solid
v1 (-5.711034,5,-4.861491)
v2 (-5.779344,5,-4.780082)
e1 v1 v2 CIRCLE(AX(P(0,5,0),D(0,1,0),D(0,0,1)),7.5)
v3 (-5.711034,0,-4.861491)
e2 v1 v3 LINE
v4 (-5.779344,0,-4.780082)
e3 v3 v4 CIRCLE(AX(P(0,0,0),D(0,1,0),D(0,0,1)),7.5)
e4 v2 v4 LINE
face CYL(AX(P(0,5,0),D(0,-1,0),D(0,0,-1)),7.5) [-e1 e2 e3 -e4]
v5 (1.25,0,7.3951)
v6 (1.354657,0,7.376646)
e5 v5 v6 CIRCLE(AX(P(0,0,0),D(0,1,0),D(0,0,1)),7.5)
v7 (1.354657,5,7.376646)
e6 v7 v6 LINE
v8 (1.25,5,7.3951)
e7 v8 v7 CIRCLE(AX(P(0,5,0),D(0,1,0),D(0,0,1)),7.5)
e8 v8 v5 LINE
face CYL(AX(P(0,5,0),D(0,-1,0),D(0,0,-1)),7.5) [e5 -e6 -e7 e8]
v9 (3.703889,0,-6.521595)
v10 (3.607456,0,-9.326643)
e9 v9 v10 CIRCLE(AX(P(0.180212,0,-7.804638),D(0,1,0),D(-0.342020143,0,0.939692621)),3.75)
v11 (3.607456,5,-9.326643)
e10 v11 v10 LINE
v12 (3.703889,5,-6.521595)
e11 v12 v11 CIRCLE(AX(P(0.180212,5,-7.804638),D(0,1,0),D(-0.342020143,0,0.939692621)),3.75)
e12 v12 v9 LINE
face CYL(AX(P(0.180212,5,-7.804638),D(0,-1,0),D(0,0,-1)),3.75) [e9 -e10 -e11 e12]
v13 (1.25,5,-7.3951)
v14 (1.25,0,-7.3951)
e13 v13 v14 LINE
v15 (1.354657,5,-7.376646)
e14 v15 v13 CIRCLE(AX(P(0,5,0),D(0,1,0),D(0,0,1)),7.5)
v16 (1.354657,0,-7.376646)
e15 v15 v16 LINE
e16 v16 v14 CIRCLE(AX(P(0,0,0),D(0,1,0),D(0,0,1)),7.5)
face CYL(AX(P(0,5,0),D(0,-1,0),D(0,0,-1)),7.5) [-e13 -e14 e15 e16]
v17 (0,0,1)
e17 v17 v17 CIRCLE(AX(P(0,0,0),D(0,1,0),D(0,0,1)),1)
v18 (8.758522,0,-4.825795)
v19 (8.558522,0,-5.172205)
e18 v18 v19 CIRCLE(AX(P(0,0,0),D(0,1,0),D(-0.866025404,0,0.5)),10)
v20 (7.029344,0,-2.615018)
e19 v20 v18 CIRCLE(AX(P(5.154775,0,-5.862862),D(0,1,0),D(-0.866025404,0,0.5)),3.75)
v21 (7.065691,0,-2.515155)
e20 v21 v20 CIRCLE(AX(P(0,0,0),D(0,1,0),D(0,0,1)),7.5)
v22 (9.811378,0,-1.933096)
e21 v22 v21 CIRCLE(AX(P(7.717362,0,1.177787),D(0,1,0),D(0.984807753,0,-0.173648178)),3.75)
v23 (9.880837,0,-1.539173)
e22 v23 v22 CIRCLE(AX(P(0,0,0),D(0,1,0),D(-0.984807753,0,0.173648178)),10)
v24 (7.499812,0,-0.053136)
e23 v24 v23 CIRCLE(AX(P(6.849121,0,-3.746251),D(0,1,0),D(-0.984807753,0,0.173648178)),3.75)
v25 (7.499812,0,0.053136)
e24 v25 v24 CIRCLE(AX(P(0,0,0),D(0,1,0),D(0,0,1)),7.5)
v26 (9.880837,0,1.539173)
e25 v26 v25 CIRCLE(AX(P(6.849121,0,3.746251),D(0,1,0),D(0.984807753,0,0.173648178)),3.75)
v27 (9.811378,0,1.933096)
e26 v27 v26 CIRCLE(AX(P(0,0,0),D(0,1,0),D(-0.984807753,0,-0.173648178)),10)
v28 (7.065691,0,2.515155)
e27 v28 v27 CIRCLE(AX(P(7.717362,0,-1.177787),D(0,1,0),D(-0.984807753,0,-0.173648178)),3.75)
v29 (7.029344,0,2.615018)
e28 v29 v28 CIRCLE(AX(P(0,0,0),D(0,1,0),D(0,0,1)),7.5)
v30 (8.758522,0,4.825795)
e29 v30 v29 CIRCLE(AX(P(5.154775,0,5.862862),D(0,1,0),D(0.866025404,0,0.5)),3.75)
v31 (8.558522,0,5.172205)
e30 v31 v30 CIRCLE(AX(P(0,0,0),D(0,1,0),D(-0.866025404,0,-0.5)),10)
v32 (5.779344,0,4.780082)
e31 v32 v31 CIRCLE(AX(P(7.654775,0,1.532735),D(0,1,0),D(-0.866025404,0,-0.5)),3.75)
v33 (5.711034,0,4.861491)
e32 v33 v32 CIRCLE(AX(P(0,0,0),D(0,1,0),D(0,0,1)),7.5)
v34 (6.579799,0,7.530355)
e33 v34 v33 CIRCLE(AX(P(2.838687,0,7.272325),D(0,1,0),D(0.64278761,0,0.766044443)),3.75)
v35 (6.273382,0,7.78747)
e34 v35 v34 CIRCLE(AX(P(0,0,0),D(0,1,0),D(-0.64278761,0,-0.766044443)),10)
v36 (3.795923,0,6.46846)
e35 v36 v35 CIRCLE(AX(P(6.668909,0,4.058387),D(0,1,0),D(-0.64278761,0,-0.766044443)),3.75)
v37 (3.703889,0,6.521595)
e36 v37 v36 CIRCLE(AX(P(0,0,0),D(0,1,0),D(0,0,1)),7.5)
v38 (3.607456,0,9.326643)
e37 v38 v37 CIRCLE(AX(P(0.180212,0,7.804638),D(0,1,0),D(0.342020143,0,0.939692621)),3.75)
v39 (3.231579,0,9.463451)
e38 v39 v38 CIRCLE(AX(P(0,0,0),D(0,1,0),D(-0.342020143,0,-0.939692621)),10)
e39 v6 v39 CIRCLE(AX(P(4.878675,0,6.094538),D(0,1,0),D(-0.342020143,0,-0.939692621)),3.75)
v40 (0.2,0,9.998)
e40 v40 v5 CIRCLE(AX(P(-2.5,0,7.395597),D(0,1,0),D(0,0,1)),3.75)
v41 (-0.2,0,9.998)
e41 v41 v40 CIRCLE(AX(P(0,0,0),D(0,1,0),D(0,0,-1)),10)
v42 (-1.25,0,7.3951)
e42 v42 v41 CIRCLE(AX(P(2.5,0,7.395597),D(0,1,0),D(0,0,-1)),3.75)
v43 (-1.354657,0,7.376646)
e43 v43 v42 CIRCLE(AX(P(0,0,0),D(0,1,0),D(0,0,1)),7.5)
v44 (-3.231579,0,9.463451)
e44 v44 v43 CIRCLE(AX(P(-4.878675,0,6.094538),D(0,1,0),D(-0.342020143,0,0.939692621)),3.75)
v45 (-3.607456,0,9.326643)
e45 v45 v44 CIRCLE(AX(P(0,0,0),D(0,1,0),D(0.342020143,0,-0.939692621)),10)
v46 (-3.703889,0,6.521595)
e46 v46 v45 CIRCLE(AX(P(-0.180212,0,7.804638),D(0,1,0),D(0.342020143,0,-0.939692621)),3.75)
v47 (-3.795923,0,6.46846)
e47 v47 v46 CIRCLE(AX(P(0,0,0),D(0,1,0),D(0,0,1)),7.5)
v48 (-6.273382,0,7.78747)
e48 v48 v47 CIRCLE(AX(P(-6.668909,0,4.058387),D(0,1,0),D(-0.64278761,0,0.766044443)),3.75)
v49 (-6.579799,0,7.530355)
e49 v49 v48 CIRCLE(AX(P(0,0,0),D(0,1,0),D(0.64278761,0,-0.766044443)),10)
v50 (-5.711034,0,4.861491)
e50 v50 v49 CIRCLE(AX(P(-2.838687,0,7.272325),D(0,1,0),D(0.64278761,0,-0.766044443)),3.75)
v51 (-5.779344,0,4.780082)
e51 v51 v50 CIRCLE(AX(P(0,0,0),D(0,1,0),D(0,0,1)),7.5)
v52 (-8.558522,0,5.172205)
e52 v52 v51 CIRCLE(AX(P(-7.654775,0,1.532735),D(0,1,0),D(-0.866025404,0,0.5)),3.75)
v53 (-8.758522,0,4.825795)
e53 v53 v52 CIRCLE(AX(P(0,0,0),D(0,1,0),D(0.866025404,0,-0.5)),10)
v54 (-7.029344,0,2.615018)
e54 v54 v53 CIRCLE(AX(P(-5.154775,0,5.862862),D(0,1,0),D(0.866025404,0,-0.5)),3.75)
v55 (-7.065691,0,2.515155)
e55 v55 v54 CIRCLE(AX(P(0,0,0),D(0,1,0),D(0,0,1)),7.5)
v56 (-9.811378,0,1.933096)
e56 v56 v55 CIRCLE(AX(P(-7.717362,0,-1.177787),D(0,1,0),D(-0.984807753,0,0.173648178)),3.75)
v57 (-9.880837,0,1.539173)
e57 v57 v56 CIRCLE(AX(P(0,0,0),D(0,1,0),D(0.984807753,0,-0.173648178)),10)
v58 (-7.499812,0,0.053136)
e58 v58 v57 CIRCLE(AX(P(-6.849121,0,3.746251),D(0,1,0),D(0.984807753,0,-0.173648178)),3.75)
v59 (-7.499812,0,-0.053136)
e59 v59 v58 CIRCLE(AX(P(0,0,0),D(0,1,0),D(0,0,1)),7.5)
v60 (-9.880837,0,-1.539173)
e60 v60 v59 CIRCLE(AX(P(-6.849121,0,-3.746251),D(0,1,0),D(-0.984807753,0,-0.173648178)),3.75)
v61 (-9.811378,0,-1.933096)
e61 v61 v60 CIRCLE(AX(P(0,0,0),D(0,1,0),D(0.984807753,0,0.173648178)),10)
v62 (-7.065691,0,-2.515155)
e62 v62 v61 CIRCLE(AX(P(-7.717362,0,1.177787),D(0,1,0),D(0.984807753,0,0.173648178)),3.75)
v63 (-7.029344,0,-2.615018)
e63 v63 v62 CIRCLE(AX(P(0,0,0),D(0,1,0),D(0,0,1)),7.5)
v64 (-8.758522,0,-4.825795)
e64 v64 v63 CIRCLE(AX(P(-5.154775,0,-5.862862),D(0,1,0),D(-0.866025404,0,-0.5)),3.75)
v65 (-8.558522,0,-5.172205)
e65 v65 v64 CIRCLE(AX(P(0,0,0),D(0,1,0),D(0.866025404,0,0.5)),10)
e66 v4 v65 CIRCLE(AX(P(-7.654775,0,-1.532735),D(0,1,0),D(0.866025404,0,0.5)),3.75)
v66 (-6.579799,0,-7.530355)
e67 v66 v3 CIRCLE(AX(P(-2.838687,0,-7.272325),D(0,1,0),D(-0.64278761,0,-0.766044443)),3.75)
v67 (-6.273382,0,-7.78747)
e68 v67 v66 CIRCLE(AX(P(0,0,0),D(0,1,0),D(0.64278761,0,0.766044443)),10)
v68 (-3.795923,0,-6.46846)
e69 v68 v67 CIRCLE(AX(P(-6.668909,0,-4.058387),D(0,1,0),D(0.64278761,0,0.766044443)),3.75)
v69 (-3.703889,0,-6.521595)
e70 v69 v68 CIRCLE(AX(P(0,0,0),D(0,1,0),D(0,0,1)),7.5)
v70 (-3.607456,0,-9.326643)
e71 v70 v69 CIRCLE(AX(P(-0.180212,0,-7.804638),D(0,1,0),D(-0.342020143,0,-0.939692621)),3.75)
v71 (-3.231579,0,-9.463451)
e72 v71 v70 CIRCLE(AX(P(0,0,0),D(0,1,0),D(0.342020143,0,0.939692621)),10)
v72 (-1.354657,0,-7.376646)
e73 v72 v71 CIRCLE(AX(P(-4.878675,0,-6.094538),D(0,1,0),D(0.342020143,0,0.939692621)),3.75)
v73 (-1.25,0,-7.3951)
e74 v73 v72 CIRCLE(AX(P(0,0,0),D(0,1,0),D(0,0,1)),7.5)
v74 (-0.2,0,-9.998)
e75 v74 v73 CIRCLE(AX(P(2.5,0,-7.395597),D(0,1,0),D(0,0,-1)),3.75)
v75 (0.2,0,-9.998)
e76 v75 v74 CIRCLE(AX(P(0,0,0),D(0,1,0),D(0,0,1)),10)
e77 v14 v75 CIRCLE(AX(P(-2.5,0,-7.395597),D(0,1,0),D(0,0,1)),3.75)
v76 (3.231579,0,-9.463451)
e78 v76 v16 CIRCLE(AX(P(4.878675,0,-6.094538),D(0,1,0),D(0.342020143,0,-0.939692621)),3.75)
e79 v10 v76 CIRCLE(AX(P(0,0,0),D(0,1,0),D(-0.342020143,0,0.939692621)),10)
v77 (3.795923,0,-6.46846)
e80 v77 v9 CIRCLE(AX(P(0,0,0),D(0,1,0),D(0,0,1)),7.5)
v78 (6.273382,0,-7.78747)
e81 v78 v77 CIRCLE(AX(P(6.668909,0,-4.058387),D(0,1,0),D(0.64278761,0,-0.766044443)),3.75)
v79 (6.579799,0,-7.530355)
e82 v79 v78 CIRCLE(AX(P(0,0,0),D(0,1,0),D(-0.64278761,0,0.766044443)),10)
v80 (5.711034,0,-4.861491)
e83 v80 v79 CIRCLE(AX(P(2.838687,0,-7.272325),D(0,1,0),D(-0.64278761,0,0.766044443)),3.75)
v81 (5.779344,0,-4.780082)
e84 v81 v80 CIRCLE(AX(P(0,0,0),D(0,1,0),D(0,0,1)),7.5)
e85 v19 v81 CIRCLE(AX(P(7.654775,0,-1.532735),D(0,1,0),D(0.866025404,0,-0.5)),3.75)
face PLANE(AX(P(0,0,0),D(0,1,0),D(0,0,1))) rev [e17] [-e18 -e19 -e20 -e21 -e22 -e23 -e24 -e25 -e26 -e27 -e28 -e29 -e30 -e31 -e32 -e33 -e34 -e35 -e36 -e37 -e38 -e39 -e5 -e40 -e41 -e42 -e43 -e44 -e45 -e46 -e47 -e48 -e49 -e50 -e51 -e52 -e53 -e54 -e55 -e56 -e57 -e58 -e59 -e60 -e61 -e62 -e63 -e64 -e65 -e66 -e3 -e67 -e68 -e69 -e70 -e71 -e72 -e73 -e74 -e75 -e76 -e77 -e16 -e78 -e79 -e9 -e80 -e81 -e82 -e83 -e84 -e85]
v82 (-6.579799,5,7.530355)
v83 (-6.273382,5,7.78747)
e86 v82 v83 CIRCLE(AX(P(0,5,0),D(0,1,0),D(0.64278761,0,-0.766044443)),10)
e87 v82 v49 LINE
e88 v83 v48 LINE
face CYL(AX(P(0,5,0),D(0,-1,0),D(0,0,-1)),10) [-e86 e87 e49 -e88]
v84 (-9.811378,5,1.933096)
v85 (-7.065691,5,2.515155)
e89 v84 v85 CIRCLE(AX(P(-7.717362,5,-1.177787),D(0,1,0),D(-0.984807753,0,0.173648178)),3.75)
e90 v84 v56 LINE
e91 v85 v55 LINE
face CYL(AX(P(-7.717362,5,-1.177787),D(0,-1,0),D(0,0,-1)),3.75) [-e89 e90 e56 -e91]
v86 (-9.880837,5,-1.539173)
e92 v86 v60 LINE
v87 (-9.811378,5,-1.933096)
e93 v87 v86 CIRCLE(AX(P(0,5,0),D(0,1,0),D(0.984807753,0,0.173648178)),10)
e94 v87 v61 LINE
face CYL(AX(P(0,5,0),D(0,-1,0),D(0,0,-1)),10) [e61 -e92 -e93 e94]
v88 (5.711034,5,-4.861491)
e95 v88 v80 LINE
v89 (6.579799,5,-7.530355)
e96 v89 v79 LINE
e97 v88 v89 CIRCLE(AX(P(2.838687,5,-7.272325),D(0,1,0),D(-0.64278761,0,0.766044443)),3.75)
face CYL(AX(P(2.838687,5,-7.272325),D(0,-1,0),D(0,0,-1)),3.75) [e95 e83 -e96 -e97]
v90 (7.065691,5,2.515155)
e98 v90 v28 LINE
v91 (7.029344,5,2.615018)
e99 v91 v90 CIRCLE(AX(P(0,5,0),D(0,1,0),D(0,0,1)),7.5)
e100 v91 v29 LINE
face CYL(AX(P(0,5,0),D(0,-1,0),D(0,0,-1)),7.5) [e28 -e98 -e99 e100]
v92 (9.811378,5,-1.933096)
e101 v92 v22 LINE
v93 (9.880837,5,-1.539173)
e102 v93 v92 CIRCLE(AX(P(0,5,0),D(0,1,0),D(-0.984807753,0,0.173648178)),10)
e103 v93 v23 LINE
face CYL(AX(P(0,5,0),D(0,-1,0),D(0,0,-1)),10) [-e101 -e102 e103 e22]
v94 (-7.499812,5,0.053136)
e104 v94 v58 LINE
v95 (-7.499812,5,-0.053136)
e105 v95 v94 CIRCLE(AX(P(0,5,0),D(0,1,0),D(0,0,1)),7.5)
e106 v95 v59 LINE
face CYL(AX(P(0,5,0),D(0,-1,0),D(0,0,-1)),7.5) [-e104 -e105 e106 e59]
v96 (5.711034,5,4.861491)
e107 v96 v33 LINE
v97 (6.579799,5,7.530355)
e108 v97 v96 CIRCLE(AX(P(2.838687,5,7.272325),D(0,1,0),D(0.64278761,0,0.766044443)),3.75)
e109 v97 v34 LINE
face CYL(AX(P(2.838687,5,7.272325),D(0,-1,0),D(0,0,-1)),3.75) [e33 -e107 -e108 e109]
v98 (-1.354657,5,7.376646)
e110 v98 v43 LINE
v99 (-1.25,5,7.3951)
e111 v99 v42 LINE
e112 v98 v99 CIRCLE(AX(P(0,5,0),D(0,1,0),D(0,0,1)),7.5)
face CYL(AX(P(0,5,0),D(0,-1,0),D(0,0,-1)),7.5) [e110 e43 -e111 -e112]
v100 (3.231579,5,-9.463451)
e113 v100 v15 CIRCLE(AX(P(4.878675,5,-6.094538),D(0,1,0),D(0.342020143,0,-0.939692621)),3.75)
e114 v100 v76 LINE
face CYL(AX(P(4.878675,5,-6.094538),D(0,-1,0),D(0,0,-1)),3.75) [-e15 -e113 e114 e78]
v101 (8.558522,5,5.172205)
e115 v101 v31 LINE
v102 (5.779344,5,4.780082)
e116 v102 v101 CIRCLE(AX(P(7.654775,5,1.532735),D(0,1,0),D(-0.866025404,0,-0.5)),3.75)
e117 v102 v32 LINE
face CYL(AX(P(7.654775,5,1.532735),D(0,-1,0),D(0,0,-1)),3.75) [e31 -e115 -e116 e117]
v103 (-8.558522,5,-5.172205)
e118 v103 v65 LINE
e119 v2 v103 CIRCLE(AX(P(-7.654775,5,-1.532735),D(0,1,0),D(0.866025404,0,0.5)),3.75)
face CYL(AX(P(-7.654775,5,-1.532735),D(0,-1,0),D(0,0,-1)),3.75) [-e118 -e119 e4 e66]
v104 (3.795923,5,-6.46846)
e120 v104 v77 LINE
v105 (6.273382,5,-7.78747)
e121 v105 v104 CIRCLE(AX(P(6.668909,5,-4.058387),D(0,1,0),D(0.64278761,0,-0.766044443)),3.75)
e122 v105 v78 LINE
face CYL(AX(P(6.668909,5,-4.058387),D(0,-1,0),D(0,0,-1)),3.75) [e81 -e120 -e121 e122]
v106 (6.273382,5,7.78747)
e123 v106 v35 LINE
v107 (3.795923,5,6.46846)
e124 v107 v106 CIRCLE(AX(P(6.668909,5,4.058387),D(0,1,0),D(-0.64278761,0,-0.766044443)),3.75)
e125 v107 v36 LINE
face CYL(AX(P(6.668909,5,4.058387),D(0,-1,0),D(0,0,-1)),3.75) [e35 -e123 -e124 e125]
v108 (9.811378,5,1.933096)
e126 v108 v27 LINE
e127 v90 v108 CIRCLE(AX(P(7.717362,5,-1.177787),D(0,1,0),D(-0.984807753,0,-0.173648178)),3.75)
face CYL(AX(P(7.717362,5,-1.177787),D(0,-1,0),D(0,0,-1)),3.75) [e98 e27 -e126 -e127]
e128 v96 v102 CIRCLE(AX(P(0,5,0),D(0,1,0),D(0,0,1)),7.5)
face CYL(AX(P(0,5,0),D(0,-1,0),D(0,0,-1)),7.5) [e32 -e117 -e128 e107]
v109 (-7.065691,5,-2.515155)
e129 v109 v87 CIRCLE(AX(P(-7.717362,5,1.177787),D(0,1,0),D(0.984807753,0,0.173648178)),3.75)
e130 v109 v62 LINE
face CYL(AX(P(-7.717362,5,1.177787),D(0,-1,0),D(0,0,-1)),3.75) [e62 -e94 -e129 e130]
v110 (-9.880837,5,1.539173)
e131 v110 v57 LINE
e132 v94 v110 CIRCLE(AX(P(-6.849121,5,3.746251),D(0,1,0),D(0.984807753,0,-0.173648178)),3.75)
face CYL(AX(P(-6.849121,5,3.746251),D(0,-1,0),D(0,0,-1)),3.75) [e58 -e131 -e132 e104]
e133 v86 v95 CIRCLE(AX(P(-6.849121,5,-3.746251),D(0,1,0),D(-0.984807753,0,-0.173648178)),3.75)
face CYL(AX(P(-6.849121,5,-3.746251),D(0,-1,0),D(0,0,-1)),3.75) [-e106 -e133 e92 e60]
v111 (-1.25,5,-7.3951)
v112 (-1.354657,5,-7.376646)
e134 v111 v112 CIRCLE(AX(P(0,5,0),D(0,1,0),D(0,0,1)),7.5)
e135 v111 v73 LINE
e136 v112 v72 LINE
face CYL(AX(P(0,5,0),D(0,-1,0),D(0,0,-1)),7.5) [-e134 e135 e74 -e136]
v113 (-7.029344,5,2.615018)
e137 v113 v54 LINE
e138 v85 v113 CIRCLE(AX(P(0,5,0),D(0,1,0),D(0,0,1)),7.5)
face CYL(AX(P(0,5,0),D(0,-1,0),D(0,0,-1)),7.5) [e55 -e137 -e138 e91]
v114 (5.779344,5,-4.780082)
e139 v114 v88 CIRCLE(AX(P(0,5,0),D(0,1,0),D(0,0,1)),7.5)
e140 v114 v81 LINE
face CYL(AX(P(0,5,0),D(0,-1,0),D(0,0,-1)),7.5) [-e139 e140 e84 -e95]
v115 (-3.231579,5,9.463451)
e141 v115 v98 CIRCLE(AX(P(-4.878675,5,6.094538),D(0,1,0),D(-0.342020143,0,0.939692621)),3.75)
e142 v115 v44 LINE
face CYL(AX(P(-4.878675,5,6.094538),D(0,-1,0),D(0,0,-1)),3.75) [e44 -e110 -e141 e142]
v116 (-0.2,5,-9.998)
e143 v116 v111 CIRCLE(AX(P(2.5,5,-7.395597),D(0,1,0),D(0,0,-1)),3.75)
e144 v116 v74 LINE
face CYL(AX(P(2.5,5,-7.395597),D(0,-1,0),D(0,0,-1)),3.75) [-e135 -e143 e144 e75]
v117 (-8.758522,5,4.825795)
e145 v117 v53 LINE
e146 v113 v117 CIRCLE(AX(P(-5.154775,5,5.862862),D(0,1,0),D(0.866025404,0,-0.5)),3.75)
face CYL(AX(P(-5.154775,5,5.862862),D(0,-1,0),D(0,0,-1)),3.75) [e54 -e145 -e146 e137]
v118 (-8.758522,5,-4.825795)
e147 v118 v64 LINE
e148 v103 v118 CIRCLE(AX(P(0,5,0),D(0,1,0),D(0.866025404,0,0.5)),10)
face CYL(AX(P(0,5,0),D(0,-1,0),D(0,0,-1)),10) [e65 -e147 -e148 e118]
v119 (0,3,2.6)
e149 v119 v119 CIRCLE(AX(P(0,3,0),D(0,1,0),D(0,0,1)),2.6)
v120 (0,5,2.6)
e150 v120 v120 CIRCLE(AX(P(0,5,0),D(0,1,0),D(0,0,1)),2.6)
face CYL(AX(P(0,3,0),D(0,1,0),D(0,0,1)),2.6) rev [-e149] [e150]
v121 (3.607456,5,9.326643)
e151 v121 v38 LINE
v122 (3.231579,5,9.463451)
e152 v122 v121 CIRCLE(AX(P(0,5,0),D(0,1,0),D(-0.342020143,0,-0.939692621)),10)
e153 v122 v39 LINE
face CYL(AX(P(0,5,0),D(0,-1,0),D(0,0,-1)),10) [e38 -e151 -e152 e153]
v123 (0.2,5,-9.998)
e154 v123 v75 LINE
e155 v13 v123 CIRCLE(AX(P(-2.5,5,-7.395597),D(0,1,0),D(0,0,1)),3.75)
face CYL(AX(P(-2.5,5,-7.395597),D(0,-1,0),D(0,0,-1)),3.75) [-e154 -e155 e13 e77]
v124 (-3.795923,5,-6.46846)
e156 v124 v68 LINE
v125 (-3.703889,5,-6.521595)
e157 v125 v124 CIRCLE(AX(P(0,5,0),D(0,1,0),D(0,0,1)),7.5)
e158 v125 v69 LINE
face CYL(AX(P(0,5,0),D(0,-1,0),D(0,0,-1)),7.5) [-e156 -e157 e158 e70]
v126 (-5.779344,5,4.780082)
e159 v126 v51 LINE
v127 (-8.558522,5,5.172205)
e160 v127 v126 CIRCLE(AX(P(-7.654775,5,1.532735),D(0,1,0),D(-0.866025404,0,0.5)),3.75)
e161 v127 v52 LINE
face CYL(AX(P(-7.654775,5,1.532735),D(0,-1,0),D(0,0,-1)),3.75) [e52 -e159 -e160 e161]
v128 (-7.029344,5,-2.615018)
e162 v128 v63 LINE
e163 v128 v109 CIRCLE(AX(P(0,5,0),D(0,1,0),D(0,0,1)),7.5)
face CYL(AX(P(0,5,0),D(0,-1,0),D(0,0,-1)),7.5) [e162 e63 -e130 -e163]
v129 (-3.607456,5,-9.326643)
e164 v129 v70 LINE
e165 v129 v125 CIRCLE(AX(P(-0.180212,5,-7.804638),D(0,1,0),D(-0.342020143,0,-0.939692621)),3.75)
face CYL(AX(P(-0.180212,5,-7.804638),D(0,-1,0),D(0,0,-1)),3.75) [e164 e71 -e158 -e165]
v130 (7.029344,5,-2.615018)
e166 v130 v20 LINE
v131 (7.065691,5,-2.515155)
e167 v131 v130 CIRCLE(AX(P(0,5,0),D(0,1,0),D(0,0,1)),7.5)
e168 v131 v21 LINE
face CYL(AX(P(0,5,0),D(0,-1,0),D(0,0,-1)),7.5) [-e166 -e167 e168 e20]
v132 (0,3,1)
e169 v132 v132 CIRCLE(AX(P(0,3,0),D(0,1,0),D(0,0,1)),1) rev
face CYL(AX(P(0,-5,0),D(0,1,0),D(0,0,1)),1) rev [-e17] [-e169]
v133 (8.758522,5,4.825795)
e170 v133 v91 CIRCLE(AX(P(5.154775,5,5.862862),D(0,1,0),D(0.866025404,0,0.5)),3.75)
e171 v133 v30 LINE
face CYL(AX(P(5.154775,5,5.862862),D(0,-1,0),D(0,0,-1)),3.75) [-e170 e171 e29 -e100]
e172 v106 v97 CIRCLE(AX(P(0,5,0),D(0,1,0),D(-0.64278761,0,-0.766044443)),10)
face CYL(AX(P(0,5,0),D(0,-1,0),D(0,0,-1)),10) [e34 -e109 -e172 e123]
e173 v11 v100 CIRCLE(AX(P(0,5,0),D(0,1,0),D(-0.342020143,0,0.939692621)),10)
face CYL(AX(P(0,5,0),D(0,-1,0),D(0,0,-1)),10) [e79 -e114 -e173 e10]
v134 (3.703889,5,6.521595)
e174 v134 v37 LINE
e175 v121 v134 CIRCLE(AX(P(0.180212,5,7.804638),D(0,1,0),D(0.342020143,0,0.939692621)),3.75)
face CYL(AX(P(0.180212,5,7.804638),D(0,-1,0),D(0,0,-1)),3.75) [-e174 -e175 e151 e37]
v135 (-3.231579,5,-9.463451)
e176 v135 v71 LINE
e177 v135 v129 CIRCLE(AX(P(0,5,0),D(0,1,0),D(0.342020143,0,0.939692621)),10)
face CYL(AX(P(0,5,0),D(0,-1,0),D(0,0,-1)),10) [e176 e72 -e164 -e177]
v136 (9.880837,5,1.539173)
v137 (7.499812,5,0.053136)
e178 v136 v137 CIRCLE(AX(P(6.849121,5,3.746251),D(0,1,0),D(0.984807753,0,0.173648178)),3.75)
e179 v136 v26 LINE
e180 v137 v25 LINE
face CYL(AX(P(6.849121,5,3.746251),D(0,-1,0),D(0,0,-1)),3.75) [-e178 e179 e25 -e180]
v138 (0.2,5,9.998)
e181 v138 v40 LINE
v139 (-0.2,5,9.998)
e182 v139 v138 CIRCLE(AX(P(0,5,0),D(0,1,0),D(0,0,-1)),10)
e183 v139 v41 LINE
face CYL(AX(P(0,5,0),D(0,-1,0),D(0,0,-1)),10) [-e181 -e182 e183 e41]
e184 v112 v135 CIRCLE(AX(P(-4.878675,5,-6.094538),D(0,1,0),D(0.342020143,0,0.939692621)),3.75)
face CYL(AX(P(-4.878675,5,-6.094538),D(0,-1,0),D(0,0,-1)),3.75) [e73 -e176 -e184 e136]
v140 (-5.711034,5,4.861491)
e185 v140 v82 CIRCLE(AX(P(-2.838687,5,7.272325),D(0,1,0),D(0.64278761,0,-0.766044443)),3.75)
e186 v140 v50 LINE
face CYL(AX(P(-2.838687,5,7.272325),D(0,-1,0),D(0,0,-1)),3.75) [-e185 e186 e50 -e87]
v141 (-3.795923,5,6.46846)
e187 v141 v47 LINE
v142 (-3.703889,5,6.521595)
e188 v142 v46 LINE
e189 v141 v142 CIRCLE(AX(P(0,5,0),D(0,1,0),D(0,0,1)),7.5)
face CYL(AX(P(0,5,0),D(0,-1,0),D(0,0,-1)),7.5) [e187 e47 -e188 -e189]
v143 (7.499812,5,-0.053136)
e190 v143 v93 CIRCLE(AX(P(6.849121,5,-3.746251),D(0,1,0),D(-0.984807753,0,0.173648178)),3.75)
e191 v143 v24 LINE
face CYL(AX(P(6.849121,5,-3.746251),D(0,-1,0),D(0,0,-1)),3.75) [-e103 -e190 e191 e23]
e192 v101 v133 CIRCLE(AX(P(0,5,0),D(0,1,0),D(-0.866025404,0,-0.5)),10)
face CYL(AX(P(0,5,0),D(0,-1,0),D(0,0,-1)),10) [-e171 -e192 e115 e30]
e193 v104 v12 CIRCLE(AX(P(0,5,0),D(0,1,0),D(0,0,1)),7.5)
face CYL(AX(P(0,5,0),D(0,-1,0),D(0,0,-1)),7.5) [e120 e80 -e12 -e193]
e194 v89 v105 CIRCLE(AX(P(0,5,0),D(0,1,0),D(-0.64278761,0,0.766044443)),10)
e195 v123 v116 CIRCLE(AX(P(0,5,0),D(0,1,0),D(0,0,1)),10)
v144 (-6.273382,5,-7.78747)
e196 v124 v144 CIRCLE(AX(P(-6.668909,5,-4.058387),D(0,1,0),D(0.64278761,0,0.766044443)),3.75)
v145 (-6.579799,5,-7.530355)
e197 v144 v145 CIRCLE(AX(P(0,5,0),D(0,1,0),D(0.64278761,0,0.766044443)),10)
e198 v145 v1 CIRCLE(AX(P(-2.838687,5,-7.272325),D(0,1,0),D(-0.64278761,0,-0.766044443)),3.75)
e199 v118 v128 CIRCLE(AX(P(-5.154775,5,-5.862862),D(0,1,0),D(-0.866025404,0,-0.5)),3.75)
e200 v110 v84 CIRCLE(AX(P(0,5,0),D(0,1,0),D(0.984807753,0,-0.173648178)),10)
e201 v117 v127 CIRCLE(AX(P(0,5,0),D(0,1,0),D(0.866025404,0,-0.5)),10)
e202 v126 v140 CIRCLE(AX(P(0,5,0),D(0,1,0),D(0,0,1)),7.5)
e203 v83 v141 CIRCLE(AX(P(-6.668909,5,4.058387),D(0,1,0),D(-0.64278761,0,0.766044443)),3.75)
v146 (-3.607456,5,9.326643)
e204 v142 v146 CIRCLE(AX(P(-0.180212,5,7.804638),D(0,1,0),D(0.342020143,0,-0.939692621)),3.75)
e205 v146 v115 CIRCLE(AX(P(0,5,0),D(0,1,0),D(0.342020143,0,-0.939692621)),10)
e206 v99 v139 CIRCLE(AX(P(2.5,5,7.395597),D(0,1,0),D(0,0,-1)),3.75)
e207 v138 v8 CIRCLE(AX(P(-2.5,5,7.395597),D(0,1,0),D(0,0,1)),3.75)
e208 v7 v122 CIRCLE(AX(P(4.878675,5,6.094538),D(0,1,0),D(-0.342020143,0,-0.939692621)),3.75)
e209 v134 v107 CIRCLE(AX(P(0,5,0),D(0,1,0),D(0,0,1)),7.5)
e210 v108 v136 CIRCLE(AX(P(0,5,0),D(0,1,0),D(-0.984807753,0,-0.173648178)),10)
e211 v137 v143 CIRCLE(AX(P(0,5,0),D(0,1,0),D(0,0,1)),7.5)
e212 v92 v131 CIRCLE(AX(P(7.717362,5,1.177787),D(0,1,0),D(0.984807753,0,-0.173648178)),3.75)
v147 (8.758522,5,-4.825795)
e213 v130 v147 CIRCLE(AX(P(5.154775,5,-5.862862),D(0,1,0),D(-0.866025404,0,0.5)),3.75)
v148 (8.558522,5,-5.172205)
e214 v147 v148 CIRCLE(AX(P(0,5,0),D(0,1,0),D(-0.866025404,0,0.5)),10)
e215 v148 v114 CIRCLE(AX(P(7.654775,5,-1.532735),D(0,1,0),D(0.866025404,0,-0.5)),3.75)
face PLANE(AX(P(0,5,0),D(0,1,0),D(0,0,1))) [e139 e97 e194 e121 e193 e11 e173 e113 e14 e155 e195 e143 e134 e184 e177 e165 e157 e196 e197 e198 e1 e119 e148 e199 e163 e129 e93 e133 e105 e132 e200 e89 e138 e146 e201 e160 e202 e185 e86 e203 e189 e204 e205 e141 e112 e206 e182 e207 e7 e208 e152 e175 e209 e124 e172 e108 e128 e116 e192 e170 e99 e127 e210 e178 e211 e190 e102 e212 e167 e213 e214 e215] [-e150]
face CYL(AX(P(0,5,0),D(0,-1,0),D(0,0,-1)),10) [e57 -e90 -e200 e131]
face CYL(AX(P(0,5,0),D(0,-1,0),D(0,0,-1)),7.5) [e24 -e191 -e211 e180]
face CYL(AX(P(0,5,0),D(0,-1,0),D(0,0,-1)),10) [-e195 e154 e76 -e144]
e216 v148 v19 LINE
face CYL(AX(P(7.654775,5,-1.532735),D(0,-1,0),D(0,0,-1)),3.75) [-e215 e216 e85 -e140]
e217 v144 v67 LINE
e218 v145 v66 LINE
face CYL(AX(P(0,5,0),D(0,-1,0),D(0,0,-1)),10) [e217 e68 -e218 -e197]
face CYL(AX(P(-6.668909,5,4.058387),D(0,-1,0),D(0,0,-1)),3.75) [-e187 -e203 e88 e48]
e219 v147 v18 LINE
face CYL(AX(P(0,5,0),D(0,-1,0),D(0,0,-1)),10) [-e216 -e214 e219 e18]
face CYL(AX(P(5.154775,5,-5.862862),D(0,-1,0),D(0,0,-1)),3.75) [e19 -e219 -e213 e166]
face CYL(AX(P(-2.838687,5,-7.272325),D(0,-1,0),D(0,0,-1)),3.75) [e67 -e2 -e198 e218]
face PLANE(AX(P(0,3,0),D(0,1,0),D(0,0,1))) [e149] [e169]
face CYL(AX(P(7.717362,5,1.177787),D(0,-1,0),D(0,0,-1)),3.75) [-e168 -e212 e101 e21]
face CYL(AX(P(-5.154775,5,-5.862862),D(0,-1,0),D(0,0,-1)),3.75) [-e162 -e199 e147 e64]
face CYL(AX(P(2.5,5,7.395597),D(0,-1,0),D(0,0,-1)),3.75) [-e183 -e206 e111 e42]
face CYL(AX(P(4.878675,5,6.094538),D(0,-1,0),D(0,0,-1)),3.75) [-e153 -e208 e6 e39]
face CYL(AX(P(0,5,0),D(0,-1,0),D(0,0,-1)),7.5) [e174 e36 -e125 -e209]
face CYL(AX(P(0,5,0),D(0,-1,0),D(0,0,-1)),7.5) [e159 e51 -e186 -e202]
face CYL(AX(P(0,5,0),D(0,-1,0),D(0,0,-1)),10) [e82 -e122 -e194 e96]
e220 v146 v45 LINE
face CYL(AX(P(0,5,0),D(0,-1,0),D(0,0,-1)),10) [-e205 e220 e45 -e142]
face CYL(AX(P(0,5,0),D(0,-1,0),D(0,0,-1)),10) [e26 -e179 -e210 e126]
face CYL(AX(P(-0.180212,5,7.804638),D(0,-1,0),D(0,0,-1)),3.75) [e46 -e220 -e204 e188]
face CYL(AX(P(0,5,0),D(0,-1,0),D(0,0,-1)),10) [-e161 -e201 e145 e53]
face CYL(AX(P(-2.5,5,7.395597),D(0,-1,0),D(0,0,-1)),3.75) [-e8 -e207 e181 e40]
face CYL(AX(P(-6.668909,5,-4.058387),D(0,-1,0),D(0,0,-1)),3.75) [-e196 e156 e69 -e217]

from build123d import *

# Parameters (mm, degrees)
SKETCH1_R           = 7.5
BOSS_EXTRUDE1_DEPTH = 5
SKETCH2_R           = 1
CUT_EXTRUDE1_DEPTH  = 10
SKETCH3_R           = 2.6
CUT_EXTRUDE2_DEPTH  = 2
BOSS_EXTRUDE3_DEPTH = 5
CIRPATTERN1_DEPTH   = 5


# Read off the part's stored shape, not the designer's step: CirPattern1
with BuildPart() as part:
    # Sketch1 → Boss-Extrude1 (new body)
    with BuildSketch(Plane(origin=(0, 0, 0), x_dir=(1, 0, 0), z_dir=(0, 1, 0))):
        with Locations(Location((0, 0, 0), (0, 0, 270))):
            Circle(SKETCH1_R)
    extrude(amount=BOSS_EXTRUDE1_DEPTH)

    # Sketch2 → Cut-Extrude1 (cut)
    with BuildSketch(Plane(origin=(0, 5, 0), x_dir=(1, 0, 0), z_dir=(0, 1, 0))):
        with Locations(Location((0, 0, 0), (0, 0, 270))):
            Circle(SKETCH2_R)
    extrude(amount=-CUT_EXTRUDE1_DEPTH, mode=Mode.SUBTRACT)

    # Sketch3 → Cut-Extrude2 (cut)
    with BuildSketch(Plane(origin=(0, 5, 0), x_dir=(1, 0, 0), z_dir=(0, 1, 0))):
        with Locations(Location((0, 0, 0), (0, 0, 270))):
            Circle(SKETCH3_R)
    extrude(amount=-CUT_EXTRUDE2_DEPTH, mode=Mode.SUBTRACT)

    # Sketch6 → Boss-Extrude3 (add)
    with BuildSketch(Plane(origin=(0, 0, 0), x_dir=(1, 0, 0), z_dir=(0, 1, 0))):
        with BuildLine():
            ThreePointArc((0.2, 9.9979998), (0, 10), (-0.2, 9.9979998))
            ThreePointArc((-0.2, 9.9979998), (-0.977699989, 8.79848798), (-1.25, 7.395099729))
            ThreePointArc((-1.25, 7.395099729), (0, 7.5), (1.25, 7.395099729))
            ThreePointArc((1.25, 7.395099729), (0.977699989, 8.79848798), (0.2, 9.9979998))
        make_face()
    extrude(amount=BOSS_EXTRUDE3_DEPTH)

    # CirPattern1 outline → CirPattern1 (add)
    with BuildSketch(Plane(origin=(0, 0, 0), x_dir=(1, 0, 0), z_dir=(0, 1, 0))):
        with BuildLine():
            ThreePointArc((-3.607455849, 9.326642606), (-3.927997585, 7.933481138), (-3.703888845, 6.521595466))
            ThreePointArc((-3.703888845, 6.521595466), (-2.565151075, 7.047694656), (-1.354657293, 7.376645825))
            ThreePointArc((-1.354657293, 7.376645825), (-2.090522655, 8.602267319), (-3.2315788, 9.463450663))
            ThreePointArc((-3.2315788, 9.463450663), (-3.420201433, 9.396926208), (-3.607455849, 9.326642606))
        make_face()
        with BuildLine():
            ThreePointArc((-6.579799282, 7.530354667), (-6.404520701, 6.111579386), (-5.711034032, 4.861490542))
            ThreePointArc((-5.711034032, 4.861490542), (-4.820907072, 5.745333324), (-3.795922924, 6.468459566))
            ThreePointArc((-3.795922924, 6.468459566), (-4.906597414, 7.368486264), (-6.273381504, 7.787469711))
            ThreePointArc((-6.273381504, 7.787469711), (-6.427876097, 7.660444431), (-6.579799282, 7.530354667))
        make_face()
        with BuildLine():
            ThreePointArc((-8.758521814, 4.825794819), (-8.1085641, 3.552530962), (-7.029344229, 2.61501811))
            ThreePointArc((-7.029344229, 2.61501811), (-6.495190528, 3.75), (-5.779344229, 4.780081619))
            ThreePointArc((-5.779344229, 4.780081619), (-7.130864111, 5.245957017), (-8.558521814, 5.172204981))
            ThreePointArc((-8.558521814, 5.172204981), (-8.660254038, 5), (-8.758521814, 4.825794819))
        make_face()
        with BuildLine():
            ThreePointArc((-9.880837353, 1.539172895), (-8.834594998, 0.564994875), (-7.499811769, 0.0531359))
            ThreePointArc((-7.499811769, 0.0531359), (-7.386058148, 1.302361332), (-7.065691325, 2.515155283))
            ThreePointArc((-7.065691325, 2.515155283), (-8.495043356, 2.490687933), (-9.811378082, 1.933095996))
            ThreePointArc((-9.811378082, 1.933095996), (-9.84807753, 1.736481777), (-9.880837353, 1.539172895))
        make_face()
        with BuildLine():
            ThreePointArc((-9.811378082, -1.933095996), (-8.495043356, -2.490687933), (-7.065691325, -2.515155283))
            ThreePointArc((-7.065691325, -2.515155283), (-7.386058148, -1.302361332), (-7.499811769, -0.0531359))
            ThreePointArc((-7.499811769, -0.0531359), (-8.834594998, -0.564994875), (-9.880837353, -1.539172895))
            ThreePointArc((-9.880837353, -1.539172895), (-9.84807753, -1.736481777), (-9.811378082, -1.933095996))
        make_face()
        with BuildLine():
            ThreePointArc((-8.558521814, -5.172204981), (-7.130864111, -5.245957017), (-5.779344229, -4.780081619))
            ThreePointArc((-5.779344229, -4.780081619), (-6.495190528, -3.75), (-7.029344229, -2.61501811))
            ThreePointArc((-7.029344229, -2.61501811), (-8.1085641, -3.552530962), (-8.758521814, -4.825794819))
            ThreePointArc((-8.758521814, -4.825794819), (-8.660254038, -5), (-8.558521814, -5.172204981))
        make_face()
        with BuildLine():
            ThreePointArc((-6.273381504, -7.787469711), (-4.906597414, -7.368486264), (-3.795922924, -6.468459566))
            ThreePointArc((-3.795922924, -6.468459566), (-4.820907072, -5.745333324), (-5.711034032, -4.861490542))
            ThreePointArc((-5.711034032, -4.861490542), (-6.404520701, -6.111579386), (-6.579799282, -7.530354667))
            ThreePointArc((-6.579799282, -7.530354667), (-6.427876097, -7.660444431), (-6.273381504, -7.787469711))
        make_face()
        with BuildLine():
            ThreePointArc((-3.2315788, -9.463450663), (-2.090522655, -8.602267319), (-1.354657293, -7.376645824))
            ThreePointArc((-1.354657293, -7.376645824), (-2.565151075, -7.047694656), (-3.703888845, -6.521595466))
            ThreePointArc((-3.703888845, -6.521595466), (-3.927997585, -7.933481138), (-3.607455849, -9.326642606))
            ThreePointArc((-3.607455849, -9.326642606), (-3.420201433, -9.396926208), (-3.2315788, -9.463450663))
        make_face()
        with BuildLine():
            ThreePointArc((0.2, -9.9979998), (0.977699989, -8.79848798), (1.25, -7.395099729))
            ThreePointArc((1.25, -7.395099729), (0, -7.5), (-1.25, -7.395099729))
            ThreePointArc((-1.25, -7.395099729), (-0.977699989, -8.79848798), (-0.2, -9.9979998))
            ThreePointArc((-0.2, -9.9979998), (0, -10), (0.2, -9.9979998))
        make_face()
        with BuildLine():
            ThreePointArc((3.607455849, -9.326642606), (3.927997585, -7.933481138), (3.703888845, -6.521595466))
            ThreePointArc((3.703888845, -6.521595466), (2.565151075, -7.047694656), (1.354657293, -7.376645824))
            ThreePointArc((1.354657293, -7.376645824), (2.090522655, -8.602267319), (3.2315788, -9.463450663))
            ThreePointArc((3.2315788, -9.463450663), (3.420201433, -9.396926208), (3.607455849, -9.326642606))
        make_face()
        with BuildLine():
            ThreePointArc((6.579799282, -7.530354667), (6.404520701, -6.111579386), (5.711034032, -4.861490542))
            ThreePointArc((5.711034032, -4.861490542), (4.820907072, -5.745333324), (3.795922924, -6.468459566))
            ThreePointArc((3.795922924, -6.468459566), (4.906597414, -7.368486264), (6.273381504, -7.787469711))
            ThreePointArc((6.273381504, -7.787469711), (6.427876097, -7.660444431), (6.579799282, -7.530354667))
        make_face()
        with BuildLine():
            ThreePointArc((8.758521814, -4.825794819), (8.1085641, -3.552530962), (7.029344229, -2.61501811))
            ThreePointArc((7.029344229, -2.61501811), (6.495190528, -3.75), (5.779344229, -4.780081619))
            ThreePointArc((5.779344229, -4.780081619), (7.130864111, -5.245957017), (8.558521814, -5.172204981))
            ThreePointArc((8.558521814, -5.172204981), (8.660254038, -5), (8.758521814, -4.825794819))
        make_face()
        with BuildLine():
            ThreePointArc((1.354657293, 7.376645825), (2.565151075, 7.047694656), (3.703888845, 6.521595466))
            ThreePointArc((3.703888845, 6.521595466), (3.927997585, 7.933481138), (3.607455849, 9.326642606))
            ThreePointArc((3.607455849, 9.326642606), (3.420201433, 9.396926208), (3.2315788, 9.463450663))
            ThreePointArc((3.2315788, 9.463450663), (2.090522655, 8.602267319), (1.354657293, 7.376645825))
        make_face()
        with BuildLine():
            ThreePointArc((3.795922924, 6.468459566), (4.820907072, 5.745333324), (5.711034032, 4.861490542))
            ThreePointArc((5.711034032, 4.861490542), (6.404520701, 6.111579386), (6.579799282, 7.530354667))
            ThreePointArc((6.579799282, 7.530354667), (6.427876097, 7.660444431), (6.273381504, 7.787469711))
            ThreePointArc((6.273381504, 7.787469711), (4.906597414, 7.368486264), (3.795922924, 6.468459566))
        make_face()
        with BuildLine():
            ThreePointArc((5.779344229, 4.780081619), (6.495190528, 3.75), (7.029344229, 2.61501811))
            ThreePointArc((7.029344229, 2.61501811), (8.1085641, 3.552530962), (8.758521814, 4.825794819))
            ThreePointArc((8.758521814, 4.825794819), (8.660254038, 5), (8.558521814, 5.172204981))
            ThreePointArc((8.558521814, 5.172204981), (7.130864111, 5.245957017), (5.779344229, 4.780081619))
        make_face()
        with BuildLine():
            ThreePointArc((7.065691325, 2.515155283), (7.386058148, 1.302361332), (7.499811769, 0.0531359))
            ThreePointArc((7.499811769, 0.0531359), (8.834594998, 0.564994875), (9.880837353, 1.539172895))
            ThreePointArc((9.880837353, 1.539172895), (9.84807753, 1.736481777), (9.811378082, 1.933095996))
            ThreePointArc((9.811378082, 1.933095996), (8.495043356, 2.490687933), (7.065691325, 2.515155283))
        make_face()
        with BuildLine():
            ThreePointArc((9.811378082, -1.933095996), (9.84807753, -1.736481777), (9.880837353, -1.539172895))
            ThreePointArc((9.880837353, -1.539172895), (8.834594998, -0.564994875), (7.499811769, -0.0531359))
            ThreePointArc((7.499811769, -0.0531359), (7.386058148, -1.302361332), (7.065691325, -2.515155283))
            ThreePointArc((7.065691325, -2.515155283), (8.495043356, -2.490687933), (9.811378082, -1.933095996))
        make_face()
    extrude(amount=CIRPATTERN1_DEPTH)


solid = part.part
